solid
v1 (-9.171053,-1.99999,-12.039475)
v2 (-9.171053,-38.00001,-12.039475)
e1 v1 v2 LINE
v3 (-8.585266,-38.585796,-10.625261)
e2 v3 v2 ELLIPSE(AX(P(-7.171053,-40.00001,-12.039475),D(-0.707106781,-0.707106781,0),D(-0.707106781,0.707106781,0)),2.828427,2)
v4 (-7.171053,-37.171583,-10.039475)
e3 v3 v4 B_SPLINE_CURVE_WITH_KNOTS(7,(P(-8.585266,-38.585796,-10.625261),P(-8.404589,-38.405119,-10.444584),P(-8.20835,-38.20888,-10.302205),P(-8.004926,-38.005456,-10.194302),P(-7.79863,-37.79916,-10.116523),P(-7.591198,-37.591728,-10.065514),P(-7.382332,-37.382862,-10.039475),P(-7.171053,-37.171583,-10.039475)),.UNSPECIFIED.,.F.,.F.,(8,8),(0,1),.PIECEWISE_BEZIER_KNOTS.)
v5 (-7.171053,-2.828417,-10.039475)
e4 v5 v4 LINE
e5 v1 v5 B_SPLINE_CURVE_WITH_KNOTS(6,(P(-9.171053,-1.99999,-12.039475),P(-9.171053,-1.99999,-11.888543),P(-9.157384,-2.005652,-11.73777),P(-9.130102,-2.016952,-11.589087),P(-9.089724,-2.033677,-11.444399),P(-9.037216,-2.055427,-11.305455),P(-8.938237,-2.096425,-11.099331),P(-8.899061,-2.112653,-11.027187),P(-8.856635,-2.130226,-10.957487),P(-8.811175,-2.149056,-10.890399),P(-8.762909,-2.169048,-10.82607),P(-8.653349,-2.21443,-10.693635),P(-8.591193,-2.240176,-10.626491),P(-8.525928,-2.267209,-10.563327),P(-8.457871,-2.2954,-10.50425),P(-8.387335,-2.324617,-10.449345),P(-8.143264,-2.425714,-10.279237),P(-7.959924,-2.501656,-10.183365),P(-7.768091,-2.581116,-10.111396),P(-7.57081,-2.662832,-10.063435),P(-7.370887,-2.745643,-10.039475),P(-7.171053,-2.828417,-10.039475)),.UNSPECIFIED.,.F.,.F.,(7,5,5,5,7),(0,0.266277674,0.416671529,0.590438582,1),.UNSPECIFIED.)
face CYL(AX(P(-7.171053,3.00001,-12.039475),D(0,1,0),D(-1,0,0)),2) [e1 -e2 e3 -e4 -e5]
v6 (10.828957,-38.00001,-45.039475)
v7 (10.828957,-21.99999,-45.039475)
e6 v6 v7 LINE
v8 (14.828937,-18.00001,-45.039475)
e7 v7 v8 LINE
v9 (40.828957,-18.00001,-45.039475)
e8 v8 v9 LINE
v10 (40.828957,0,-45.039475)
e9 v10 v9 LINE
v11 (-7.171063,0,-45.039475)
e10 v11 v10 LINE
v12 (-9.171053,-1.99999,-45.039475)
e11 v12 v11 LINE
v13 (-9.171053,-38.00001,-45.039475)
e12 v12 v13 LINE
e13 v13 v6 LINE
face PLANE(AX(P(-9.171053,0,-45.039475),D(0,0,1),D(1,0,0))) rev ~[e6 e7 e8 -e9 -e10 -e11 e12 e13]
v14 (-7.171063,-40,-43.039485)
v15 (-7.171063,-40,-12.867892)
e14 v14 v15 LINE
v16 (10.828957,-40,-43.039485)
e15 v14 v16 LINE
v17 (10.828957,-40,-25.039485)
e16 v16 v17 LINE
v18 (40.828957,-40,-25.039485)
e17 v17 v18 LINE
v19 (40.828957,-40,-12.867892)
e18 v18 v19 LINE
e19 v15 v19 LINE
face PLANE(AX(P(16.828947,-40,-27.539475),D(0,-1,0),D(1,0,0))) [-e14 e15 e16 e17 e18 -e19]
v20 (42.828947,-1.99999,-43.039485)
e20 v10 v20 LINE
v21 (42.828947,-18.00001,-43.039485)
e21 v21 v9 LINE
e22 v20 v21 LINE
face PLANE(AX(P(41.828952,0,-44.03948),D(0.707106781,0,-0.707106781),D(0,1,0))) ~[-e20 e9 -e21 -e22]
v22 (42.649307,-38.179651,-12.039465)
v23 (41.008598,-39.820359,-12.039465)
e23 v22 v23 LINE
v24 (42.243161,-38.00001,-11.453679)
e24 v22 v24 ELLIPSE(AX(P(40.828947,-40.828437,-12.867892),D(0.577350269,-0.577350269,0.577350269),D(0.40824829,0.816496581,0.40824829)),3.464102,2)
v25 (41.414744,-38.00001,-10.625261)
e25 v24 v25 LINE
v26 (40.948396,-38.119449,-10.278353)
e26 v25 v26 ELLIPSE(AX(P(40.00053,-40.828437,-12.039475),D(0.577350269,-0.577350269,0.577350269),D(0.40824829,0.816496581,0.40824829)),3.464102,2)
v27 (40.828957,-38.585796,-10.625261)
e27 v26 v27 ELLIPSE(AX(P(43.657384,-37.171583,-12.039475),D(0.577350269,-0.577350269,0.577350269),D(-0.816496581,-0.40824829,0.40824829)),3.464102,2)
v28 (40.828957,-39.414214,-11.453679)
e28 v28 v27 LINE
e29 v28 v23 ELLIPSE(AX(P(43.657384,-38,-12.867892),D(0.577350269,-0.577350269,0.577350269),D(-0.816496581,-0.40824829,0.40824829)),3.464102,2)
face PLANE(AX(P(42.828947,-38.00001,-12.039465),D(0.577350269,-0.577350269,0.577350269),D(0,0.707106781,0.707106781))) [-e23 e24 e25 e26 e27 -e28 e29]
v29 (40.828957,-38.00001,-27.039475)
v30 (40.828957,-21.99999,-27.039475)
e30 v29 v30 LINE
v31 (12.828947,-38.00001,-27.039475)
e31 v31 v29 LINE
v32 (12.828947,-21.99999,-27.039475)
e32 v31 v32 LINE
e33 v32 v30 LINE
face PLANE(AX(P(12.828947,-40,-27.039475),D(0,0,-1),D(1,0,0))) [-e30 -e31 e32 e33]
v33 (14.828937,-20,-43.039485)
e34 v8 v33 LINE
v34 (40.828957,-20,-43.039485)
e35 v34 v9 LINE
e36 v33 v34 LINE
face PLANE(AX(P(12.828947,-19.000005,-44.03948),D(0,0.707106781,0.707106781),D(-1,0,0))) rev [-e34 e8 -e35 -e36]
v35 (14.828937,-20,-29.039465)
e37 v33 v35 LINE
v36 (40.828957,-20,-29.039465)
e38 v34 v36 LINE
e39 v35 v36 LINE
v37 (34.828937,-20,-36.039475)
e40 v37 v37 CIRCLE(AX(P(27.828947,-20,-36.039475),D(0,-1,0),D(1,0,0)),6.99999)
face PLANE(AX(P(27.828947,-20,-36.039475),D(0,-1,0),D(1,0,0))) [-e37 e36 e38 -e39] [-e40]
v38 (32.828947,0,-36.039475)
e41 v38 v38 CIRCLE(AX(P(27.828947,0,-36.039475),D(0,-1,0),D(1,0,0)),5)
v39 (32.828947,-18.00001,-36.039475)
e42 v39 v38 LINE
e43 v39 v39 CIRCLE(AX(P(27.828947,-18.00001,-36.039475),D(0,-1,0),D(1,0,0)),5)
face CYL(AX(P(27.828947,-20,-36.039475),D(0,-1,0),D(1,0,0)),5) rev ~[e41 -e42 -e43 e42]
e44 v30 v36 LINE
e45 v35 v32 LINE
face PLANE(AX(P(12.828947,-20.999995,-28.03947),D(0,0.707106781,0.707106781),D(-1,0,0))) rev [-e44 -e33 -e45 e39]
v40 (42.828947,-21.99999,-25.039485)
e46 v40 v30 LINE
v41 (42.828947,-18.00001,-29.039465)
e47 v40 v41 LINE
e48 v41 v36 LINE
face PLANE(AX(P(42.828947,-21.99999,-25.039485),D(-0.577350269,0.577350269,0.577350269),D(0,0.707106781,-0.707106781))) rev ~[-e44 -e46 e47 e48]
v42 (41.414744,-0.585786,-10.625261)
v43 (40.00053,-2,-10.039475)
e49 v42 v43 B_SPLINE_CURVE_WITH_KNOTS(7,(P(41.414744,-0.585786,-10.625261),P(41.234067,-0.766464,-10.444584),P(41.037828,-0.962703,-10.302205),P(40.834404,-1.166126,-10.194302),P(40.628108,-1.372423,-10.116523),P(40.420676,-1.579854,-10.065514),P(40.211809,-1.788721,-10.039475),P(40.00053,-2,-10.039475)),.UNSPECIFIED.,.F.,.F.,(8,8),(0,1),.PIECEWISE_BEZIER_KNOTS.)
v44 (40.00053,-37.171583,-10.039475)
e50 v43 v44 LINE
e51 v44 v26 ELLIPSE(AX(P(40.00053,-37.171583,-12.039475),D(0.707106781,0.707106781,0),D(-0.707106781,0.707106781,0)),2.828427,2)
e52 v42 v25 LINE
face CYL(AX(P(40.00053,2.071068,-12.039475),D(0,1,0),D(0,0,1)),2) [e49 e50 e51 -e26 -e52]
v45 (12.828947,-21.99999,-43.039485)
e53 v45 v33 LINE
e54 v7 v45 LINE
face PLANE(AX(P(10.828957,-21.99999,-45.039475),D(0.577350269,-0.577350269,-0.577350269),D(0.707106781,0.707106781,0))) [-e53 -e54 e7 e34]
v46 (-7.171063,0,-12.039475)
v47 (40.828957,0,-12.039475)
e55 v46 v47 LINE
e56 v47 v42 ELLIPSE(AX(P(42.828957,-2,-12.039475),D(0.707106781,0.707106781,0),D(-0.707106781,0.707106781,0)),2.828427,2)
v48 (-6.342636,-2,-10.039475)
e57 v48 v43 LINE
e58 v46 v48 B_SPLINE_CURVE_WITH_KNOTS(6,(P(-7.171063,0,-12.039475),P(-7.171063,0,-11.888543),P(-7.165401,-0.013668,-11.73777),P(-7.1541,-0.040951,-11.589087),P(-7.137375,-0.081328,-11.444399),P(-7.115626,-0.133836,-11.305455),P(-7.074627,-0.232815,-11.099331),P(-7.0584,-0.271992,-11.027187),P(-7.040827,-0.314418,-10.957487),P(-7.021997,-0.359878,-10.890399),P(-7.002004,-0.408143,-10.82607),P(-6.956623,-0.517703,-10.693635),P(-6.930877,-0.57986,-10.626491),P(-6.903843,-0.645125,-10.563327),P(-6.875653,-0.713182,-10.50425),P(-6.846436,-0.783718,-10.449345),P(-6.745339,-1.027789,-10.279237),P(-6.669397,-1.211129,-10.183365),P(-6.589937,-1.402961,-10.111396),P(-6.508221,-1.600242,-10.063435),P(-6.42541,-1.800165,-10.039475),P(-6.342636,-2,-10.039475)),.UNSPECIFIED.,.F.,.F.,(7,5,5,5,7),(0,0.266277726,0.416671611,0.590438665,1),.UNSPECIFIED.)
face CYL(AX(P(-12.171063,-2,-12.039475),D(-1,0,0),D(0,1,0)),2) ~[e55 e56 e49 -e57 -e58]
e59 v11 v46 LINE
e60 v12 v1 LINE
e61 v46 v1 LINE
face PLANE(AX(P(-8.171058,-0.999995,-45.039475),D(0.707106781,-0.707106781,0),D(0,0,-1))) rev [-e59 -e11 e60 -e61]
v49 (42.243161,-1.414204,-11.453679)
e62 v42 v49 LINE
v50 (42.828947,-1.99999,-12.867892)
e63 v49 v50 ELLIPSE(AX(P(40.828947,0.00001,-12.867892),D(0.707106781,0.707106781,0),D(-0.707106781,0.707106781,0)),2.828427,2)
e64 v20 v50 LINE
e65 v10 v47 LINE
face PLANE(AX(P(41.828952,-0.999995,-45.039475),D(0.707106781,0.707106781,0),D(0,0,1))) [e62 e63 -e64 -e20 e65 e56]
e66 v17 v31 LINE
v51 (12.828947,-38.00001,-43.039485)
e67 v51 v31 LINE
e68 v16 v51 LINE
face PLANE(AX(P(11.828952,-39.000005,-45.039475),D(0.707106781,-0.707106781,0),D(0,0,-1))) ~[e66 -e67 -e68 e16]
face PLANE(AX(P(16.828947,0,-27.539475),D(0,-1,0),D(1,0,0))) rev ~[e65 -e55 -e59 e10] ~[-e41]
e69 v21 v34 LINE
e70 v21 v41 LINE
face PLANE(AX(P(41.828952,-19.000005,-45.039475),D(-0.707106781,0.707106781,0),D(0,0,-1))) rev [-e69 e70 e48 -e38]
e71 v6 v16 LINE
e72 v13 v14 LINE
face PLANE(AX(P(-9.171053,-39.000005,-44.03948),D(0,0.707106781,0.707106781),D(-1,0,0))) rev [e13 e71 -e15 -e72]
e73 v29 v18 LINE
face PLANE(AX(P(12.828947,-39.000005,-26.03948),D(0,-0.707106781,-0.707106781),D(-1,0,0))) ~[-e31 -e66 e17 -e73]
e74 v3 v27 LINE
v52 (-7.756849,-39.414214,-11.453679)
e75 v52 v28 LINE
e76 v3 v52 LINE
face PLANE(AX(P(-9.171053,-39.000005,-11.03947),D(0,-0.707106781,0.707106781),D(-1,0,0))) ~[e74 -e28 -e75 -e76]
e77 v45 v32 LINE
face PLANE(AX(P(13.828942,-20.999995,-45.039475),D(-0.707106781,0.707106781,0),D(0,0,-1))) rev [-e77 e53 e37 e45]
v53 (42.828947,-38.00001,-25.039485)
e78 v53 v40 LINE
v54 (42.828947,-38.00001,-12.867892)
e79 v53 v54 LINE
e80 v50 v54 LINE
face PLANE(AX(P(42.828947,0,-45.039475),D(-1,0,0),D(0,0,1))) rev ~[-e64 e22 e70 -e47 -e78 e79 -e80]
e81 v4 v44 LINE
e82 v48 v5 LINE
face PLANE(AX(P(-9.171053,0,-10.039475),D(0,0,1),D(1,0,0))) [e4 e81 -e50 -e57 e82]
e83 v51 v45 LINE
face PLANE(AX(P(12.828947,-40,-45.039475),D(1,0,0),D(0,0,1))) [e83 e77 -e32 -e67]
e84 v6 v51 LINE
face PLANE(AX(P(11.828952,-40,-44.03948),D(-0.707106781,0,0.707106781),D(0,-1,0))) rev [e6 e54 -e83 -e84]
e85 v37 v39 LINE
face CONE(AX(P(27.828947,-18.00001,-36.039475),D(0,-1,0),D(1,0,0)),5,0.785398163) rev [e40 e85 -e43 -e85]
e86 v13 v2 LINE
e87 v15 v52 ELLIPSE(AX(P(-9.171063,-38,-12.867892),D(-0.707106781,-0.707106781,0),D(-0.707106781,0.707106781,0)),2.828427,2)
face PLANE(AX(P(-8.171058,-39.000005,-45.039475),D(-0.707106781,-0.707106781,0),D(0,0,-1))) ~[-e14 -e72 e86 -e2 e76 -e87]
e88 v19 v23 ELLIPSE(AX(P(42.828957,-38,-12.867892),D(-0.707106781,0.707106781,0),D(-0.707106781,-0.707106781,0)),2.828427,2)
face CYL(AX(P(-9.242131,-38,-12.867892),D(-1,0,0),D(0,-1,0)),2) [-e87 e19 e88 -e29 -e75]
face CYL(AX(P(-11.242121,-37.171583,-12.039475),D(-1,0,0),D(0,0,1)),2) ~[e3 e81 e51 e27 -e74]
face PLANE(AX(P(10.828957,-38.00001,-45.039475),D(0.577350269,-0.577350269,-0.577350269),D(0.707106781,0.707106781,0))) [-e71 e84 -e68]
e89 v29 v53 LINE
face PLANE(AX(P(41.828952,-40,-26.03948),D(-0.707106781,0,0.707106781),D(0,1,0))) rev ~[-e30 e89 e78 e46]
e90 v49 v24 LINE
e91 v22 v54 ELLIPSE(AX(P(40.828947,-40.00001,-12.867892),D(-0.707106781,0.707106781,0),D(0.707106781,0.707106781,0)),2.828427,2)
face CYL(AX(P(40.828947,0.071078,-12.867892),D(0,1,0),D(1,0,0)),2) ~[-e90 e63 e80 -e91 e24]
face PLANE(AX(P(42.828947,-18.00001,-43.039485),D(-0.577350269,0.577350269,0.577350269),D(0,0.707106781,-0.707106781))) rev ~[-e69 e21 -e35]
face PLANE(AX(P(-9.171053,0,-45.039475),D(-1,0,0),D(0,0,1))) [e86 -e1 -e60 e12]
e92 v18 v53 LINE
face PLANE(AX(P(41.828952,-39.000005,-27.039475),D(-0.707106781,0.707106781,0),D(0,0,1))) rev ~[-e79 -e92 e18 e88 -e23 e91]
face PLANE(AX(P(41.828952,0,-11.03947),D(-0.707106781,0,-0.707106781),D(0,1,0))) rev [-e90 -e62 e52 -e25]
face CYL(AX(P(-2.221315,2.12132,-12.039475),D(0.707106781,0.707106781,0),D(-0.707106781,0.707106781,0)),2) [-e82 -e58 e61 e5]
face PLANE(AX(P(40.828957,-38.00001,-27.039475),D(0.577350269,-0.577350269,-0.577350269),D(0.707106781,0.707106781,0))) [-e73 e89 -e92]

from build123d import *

# Parameters (mm, degrees)
F0_W         = 52
F0_H         = 35
F1_DEPTH     = 40
F2_W         = 30
F2_H         = 18
F3_DEPTH     = 20
F4_R         = 5
F5_DEPTH     = 20.001
F6_SIZE      = 1.99999
F7_T1_DEPTH  = 40.1421556237
F7_T3_DEPTH  = 42.1421456237
F7_T5_DEPTH  = 46.00002
F7_T7_DEPTH  = 12.8284129826
F7_T9_DEPTH  = 54.1421456237
F7_T11_DEPTH = 58.00002
F7_T13_DEPTH = 52.1421556237


# Not quite as in the source:
# - a fillet or chamfer that OpenCascade refuses, or shapes differently, is made with other operations: its cross-section is extruded or revolved along the edge and cut away or added
# - a fillet or chamfer is up to 0.001 mm smaller than in the source, because OpenCascade refuses the exact size


with BuildPart() as f1:
    # F0 (on Front) → F1 (new body)
    with BuildSketch(Plane.XZ):
        with Locations((16.8289473057, -27.5394749641)):
            Rectangle(F0_W, F0_H)
    extrude(amount=F1_DEPTH)

    # F2 (on face) → F3 (cut)
    with BuildSketch(Plane.XZ.offset(40)):
        with Locations((27.8289473057, -36.0394749641)):
            Rectangle(F2_W, F2_H)
    extrude(amount=-F3_DEPTH, mode=Mode.SUBTRACT)

    # F4 (on face) → F5 (cut, through all)
    with BuildSketch(Plane.XZ.offset(20)):
        with Locations((27.8289473057, -36.0394749641)):
            Circle(F4_R)
    extrude(amount=-F5_DEPTH, mode=Mode.SUBTRACT)

    # F6 (size 2 in the source; OpenCascade refuses exactly that, so slightly less here)
    f6_edges = [f1.edges().sort_by_distance(p)[0] for p in [
        (-9.171053, -40, -27.539475),
        (16.828947, -40, -10.039475),
        (42.828947, -40, -18.539475),
        (27.828947, -40, -27.039475),
        (12.828947, -40, -36.039475),
        (1.828947, -40, -45.039475),
        (-9.171053, 0, -27.539475),
        (27.828947, -20, -45.039475),
        (12.828947, -20, -36.039475),
        (42.828947, -20, -36.039475),
        (27.828947, -20, -27.039475),
        (22.828947, -20, -36.039475),
        (42.828947, 0, -27.539475),
        (42.828947, -20, -10.039475),
        (42.828947, -30, -27.039475),
        (42.828947, -10, -45.039475),
        (12.828947, -30, -45.039475),
    ]]
    chamfer(f6_edges, length=F6_SIZE)

    # F7: fillet of radius 2 on 7 edges, made by hand

    # F7_s2 → F7_t1 (cut)
    with BuildSketch(Plane.XZ.offset(-0.0710778119)):
        with BuildLine():
            ThreePointArc((42.8289473057, -12.8678920889), (42.6767063707, -12.1025252242), (42.2431608681, -11.4536785265))
            Line((42.2431608681, -11.4536785265), (42.8289473057, -12.0394649641))
            Line((42.8289473057, -12.0394649641), (42.8289473057, -12.8678920889))
        make_face()
    extrude(amount=F7_T1_DEPTH, mode=Mode.SUBTRACT)

    # F7_s4 → F7_t3 (cut)
    with BuildSketch(Plane.XZ.offset(-2.0710678119)):
        with BuildLine():
            ThreePointArc((40.0005301809, -10.0394749641), (40.7658970457, -10.1917158991), (41.4147437433, -10.6252614018))
            Line((41.4147437433, -10.6252614018), (40.8289573057, -10.0394749641))
            Line((40.8289573057, -10.0394749641), (40.0005301809, -10.0394749641))
        make_face()
    extrude(amount=F7_T3_DEPTH, mode=Mode.SUBTRACT)

    # F7_s6 → F7_t5 (cut)
    with BuildSketch(Plane.XZ.offset(-3.00001)):
        with BuildLine():
            ThreePointArc((-9.1710526943, -12.0394749641), (-8.5852662567, -10.6252614018), (-7.1710526943, -10.0394749641))
            Line((-7.1710526943, -10.0394749641), (-9.1710526943, -10.0394749641))
            Line((-9.1710526943, -10.0394749641), (-9.1710526943, -12.0394749641))
        make_face()
    extrude(amount=F7_T5_DEPTH, mode=Mode.SUBTRACT)

    # F7_s8 → F7_t7 (cut)
    with BuildSketch(Plane(origin=(-0.0499974412, -0.0499974412, 0), x_dir=(0, 0, 1), z_dir=(-0.7071067812, -0.7071067812, 0))):
        with BuildLine():
            ThreePointArc((-12.0394749641, 5.0707070595), (-10.6252614018, 4.4849206218), (-10.0394749641, 3.0707070595))
            Line((-10.0394749641, 3.0707070595), (-10.0394749641, 5.0707070595))
            Line((-10.0394749641, 5.0707070595), (-12.0394749641, 5.0707070595))
        make_face()
    extrude(amount=F7_T7_DEPTH, mode=Mode.SUBTRACT)

    # F7_s10 → F7_t9 (cut)
    with BuildSketch(Plane.YZ.offset(-11.2421205062)):
        with BuildLine():
            ThreePointArc((-37.1715828753, -10.0394749641), (-37.93694974, -10.1917158991), (-38.5857964376, -10.6252614018))
            Line((-38.5857964376, -10.6252614018), (-38.00001, -10.0394749641))
            Line((-38.00001, -10.0394749641), (-37.1715828753, -10.0394749641))
        make_face()
    extrude(amount=F7_T9_DEPTH, mode=Mode.SUBTRACT)

    # F7_s12 → F7_t11 (cut)
    with BuildSketch(Plane.YZ.offset(-12.1710626943)):
        with BuildLine():
            ThreePointArc((0, -12.0394749641), (-0.5857864376, -10.6252614018), (-2, -10.0394749641))
            Line((-2, -10.0394749641), (0, -10.0394749641))
            Line((0, -10.0394749641), (0, -12.0394749641))
        make_face()
    extrude(amount=F7_T11_DEPTH, mode=Mode.SUBTRACT)

    # F7_s14 → F7_t13 (cut)
    with BuildSketch(Plane.YZ.offset(-9.2421305062)):
        with BuildLine():
            ThreePointArc((-40, -12.8678920889), (-39.847759065, -12.1025252242), (-39.4142135624, -11.4536785265))
            Line((-39.4142135624, -11.4536785265), (-40, -12.0394649641))
            Line((-40, -12.0394649641), (-40, -12.8678920889))
        make_face()
    extrude(amount=F7_T13_DEPTH, mode=Mode.SUBTRACT)


solid = f1.part
